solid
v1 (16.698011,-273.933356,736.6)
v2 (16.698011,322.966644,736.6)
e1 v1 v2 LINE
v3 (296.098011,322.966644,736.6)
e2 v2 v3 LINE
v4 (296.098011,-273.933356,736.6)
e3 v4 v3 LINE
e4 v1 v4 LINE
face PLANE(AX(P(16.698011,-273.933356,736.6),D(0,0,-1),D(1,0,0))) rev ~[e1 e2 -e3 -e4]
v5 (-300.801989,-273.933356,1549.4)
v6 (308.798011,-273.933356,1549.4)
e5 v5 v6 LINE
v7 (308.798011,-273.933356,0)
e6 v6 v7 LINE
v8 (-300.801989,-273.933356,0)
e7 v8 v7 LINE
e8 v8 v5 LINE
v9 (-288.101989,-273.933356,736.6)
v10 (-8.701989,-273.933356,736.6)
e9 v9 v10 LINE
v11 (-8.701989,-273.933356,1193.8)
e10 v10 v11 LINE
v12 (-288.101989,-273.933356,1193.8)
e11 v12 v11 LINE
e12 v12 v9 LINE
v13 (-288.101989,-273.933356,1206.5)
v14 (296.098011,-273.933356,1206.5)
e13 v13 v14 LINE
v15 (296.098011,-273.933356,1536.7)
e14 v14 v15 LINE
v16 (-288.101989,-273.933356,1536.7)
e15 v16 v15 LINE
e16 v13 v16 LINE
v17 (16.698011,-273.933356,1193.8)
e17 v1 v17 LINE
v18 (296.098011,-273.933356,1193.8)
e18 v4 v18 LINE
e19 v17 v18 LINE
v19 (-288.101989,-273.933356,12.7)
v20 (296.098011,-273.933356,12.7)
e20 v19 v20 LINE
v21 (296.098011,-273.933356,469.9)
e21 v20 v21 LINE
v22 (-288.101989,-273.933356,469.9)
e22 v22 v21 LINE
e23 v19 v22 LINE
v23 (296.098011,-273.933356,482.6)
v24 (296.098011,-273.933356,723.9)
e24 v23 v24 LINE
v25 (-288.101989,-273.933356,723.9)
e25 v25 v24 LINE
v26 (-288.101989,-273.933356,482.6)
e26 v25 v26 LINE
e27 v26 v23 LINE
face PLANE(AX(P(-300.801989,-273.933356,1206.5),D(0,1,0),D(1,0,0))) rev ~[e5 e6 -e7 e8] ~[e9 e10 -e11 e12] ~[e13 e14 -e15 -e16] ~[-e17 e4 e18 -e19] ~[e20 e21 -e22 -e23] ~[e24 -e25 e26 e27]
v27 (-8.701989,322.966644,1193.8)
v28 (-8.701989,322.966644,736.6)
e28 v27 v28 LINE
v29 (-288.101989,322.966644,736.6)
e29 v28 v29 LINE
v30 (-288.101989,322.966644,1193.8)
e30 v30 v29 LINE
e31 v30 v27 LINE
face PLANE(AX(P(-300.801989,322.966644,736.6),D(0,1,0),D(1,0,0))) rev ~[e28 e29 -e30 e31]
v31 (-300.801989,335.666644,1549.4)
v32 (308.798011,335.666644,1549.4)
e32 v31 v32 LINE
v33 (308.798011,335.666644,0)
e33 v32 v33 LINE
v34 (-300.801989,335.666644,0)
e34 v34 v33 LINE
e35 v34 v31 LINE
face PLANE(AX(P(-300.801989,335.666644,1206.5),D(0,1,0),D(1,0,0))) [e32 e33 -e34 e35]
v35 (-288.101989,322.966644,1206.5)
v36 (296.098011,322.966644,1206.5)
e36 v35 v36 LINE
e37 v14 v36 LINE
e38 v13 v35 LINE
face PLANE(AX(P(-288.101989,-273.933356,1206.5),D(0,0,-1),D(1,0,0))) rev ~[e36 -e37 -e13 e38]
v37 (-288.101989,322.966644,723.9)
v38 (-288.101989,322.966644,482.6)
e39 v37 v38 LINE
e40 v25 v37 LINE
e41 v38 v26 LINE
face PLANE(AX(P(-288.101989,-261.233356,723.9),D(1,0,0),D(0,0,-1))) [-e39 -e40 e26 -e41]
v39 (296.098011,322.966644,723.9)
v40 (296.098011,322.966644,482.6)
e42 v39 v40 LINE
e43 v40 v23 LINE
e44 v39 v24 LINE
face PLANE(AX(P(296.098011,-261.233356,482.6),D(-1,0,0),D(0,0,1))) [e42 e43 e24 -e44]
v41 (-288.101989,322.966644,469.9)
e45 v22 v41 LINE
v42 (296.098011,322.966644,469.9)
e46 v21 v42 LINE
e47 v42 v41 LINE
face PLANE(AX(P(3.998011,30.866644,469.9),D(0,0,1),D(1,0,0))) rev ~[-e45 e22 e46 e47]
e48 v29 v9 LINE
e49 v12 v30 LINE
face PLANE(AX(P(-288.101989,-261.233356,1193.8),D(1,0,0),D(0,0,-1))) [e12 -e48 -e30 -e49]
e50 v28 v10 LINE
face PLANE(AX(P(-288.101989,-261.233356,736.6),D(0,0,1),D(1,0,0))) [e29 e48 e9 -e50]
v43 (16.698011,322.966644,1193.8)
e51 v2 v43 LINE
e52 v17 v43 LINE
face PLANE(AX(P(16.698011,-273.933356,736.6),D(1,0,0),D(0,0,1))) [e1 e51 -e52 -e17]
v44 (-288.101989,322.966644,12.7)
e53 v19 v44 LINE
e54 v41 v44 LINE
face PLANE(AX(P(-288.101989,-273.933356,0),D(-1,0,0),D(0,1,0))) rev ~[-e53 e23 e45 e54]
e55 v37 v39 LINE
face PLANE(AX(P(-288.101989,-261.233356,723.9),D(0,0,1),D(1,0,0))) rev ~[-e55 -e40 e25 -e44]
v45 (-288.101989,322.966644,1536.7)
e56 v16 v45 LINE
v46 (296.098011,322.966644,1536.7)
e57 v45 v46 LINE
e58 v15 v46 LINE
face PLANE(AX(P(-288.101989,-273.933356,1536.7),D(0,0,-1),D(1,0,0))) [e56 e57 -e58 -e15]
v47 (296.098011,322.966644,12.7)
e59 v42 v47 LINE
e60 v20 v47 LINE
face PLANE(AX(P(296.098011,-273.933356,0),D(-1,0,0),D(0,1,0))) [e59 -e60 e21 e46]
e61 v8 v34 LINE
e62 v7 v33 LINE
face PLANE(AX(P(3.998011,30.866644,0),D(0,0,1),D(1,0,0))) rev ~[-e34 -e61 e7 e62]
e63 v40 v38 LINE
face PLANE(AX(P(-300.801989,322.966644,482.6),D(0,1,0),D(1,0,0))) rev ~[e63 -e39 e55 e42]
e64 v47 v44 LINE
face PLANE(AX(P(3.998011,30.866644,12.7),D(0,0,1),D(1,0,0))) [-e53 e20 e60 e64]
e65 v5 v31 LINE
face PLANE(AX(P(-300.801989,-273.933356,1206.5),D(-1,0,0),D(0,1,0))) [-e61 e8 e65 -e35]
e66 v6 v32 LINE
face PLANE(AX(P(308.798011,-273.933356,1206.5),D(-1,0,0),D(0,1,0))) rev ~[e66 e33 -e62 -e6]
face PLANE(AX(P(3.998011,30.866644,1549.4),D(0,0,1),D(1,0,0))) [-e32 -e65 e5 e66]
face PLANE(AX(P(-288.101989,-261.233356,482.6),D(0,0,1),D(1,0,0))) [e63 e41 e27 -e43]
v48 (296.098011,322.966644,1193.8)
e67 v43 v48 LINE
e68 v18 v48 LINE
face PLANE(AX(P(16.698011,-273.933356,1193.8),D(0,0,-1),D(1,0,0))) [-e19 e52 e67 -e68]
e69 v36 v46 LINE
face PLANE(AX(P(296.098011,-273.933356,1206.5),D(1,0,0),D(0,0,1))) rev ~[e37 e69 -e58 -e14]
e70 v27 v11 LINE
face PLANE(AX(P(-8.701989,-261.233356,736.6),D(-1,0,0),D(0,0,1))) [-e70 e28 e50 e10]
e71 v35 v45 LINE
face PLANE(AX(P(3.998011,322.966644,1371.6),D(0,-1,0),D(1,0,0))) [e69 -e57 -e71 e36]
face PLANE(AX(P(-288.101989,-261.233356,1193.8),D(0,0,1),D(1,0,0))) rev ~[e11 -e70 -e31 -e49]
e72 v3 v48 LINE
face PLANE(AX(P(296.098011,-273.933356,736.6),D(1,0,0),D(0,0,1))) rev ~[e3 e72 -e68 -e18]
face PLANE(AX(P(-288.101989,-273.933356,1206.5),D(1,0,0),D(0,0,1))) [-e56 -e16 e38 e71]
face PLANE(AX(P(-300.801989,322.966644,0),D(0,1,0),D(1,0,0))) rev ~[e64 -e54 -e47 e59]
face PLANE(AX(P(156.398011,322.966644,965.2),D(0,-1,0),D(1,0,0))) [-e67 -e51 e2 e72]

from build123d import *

# Parameters (mm, degrees)
F0_W      = 609.6
F0_H      = 609.6
F1_DEPTH  = 482.6
F2_T      = -12.7
F3_DEPTH  = 254
F4_T      = -12.7
F5_W      = 304.8
F5_H      = 609.6
F6_DEPTH  = 469.9
F7_T      = -12.7
F8_DEPTH  = 469.9
F9_DEPTH  = 342.9
F10_W     = 279.4
F10_H     = 457.2
F11_DEPTH = 596.9
F12_W     = 584.2
F12_H     = 330.2
F13_DEPTH = 596.9
F14_W     = 609.6
F14_H     = 1549.4
F15_DEPTH = 12.7


# Not quite as in the source:
# - a shell that OpenCascade refuses in one call is made with other operations: the cavity is built on its own and cut out


with BuildPart() as f1:
    # F0 (on Top) → F1 (new body)
    with BuildSketch(Plane.XY):
        with Locations((3.9980113506, 30.8666436833)):
            Rectangle(F0_W, F0_H)
    extrude(amount=F1_DEPTH)

    # F2
    f2_openings = [f1.faces().sort_by_distance(p)[0] for p in [
        (3.998011, -273.933356, 241.3),
    ]]
    offset(amount=F2_T, openings=f2_openings)

    # F3 (add): a face of the model
    f3_faces = [f1.faces().sort_by_distance(p)[0] for p in [
        (3.9980113506, 30.8666436833, 482.6),
    ]]
    extrude(f3_faces, amount=F3_DEPTH)

    # F4: a shell. OpenCascade refuses it in one call, so the cavity is built on its own and cut out:
    # the body offset inwards by the wall thickness, plus a prism from it out through each open face.
    f4_core = offset(f1.part, amount=F4_T, kind=Kind.INTERSECTION, mode=Mode.PRIVATE)
    f4_exits = [f4_core.faces().sort_by_distance(p)[0] for p in [
        (3.998011, -261.233356, 603.25),
    ]]
    add(f4_core, mode=Mode.SUBTRACT)
    extrude(f4_exits, amount=-F4_T, mode=Mode.SUBTRACT)

    # F5 (on face) → F6 (join)
    with BuildSketch(Plane.XY.offset(736.6)):
        with Locations((-148.4019886494, 30.8666436833)):
            Rectangle(F5_W, F5_H)
    extrude(amount=F6_DEPTH)

    # F7: a shell. OpenCascade refuses it in one call, so the cavity is built on its own and cut out:
    # the body offset inwards by the wall thickness, plus a prism from it out through each open face.
    f7_core = offset(f1.part, amount=F7_T, kind=Kind.INTERSECTION, mode=Mode.PRIVATE)
    f7_exits = [f7_core.faces().sort_by_distance(p)[0] for p in [
        (-148.401989, -261.233356, 965.2),
    ]]
    add(f7_core, mode=Mode.SUBTRACT)
    extrude(f7_exits, amount=-F7_T, mode=Mode.SUBTRACT)

    # F8 (add): a face of the model
    f8_faces = [f1.faces().sort_by_distance(p)[0] for p in [
        (156.3980113506, 30.8666436833, 736.6),
    ]]
    extrude(f8_faces, amount=F8_DEPTH)

    # F9 (add): a face of the model
    f9_faces = [f1.faces().sort_by_distance(p)[0] for p in [
        (3.9980113506, 30.8666436833, 1206.5),
    ]]
    extrude(f9_faces, amount=F9_DEPTH)

    # F10 (on face) → F11 (cut)
    with BuildSketch(Plane.XZ.offset(273.9333563167)):
        with Locations((156.3980113506, 965.2)):
            Rectangle(F10_W, F10_H)
    extrude(amount=-F11_DEPTH, mode=Mode.SUBTRACT)

    # F12 (on face) → F13 (cut)
    with BuildSketch(Plane.XZ.offset(273.9333563167)):
        with Locations((3.9980113506, 1371.6)):
            Rectangle(F12_W, F12_H)
    extrude(amount=-F13_DEPTH, mode=Mode.SUBTRACT)


with BuildPart() as f15:
    # F14 (on face) → F15 (new body)
    with BuildSketch(Plane.XZ.offset(273.9333563167)):
        with Locations((3.9980113506, 774.7)):
            Rectangle(F14_W, F14_H)
    extrude(amount=F15_DEPTH)


solid = f1.part
